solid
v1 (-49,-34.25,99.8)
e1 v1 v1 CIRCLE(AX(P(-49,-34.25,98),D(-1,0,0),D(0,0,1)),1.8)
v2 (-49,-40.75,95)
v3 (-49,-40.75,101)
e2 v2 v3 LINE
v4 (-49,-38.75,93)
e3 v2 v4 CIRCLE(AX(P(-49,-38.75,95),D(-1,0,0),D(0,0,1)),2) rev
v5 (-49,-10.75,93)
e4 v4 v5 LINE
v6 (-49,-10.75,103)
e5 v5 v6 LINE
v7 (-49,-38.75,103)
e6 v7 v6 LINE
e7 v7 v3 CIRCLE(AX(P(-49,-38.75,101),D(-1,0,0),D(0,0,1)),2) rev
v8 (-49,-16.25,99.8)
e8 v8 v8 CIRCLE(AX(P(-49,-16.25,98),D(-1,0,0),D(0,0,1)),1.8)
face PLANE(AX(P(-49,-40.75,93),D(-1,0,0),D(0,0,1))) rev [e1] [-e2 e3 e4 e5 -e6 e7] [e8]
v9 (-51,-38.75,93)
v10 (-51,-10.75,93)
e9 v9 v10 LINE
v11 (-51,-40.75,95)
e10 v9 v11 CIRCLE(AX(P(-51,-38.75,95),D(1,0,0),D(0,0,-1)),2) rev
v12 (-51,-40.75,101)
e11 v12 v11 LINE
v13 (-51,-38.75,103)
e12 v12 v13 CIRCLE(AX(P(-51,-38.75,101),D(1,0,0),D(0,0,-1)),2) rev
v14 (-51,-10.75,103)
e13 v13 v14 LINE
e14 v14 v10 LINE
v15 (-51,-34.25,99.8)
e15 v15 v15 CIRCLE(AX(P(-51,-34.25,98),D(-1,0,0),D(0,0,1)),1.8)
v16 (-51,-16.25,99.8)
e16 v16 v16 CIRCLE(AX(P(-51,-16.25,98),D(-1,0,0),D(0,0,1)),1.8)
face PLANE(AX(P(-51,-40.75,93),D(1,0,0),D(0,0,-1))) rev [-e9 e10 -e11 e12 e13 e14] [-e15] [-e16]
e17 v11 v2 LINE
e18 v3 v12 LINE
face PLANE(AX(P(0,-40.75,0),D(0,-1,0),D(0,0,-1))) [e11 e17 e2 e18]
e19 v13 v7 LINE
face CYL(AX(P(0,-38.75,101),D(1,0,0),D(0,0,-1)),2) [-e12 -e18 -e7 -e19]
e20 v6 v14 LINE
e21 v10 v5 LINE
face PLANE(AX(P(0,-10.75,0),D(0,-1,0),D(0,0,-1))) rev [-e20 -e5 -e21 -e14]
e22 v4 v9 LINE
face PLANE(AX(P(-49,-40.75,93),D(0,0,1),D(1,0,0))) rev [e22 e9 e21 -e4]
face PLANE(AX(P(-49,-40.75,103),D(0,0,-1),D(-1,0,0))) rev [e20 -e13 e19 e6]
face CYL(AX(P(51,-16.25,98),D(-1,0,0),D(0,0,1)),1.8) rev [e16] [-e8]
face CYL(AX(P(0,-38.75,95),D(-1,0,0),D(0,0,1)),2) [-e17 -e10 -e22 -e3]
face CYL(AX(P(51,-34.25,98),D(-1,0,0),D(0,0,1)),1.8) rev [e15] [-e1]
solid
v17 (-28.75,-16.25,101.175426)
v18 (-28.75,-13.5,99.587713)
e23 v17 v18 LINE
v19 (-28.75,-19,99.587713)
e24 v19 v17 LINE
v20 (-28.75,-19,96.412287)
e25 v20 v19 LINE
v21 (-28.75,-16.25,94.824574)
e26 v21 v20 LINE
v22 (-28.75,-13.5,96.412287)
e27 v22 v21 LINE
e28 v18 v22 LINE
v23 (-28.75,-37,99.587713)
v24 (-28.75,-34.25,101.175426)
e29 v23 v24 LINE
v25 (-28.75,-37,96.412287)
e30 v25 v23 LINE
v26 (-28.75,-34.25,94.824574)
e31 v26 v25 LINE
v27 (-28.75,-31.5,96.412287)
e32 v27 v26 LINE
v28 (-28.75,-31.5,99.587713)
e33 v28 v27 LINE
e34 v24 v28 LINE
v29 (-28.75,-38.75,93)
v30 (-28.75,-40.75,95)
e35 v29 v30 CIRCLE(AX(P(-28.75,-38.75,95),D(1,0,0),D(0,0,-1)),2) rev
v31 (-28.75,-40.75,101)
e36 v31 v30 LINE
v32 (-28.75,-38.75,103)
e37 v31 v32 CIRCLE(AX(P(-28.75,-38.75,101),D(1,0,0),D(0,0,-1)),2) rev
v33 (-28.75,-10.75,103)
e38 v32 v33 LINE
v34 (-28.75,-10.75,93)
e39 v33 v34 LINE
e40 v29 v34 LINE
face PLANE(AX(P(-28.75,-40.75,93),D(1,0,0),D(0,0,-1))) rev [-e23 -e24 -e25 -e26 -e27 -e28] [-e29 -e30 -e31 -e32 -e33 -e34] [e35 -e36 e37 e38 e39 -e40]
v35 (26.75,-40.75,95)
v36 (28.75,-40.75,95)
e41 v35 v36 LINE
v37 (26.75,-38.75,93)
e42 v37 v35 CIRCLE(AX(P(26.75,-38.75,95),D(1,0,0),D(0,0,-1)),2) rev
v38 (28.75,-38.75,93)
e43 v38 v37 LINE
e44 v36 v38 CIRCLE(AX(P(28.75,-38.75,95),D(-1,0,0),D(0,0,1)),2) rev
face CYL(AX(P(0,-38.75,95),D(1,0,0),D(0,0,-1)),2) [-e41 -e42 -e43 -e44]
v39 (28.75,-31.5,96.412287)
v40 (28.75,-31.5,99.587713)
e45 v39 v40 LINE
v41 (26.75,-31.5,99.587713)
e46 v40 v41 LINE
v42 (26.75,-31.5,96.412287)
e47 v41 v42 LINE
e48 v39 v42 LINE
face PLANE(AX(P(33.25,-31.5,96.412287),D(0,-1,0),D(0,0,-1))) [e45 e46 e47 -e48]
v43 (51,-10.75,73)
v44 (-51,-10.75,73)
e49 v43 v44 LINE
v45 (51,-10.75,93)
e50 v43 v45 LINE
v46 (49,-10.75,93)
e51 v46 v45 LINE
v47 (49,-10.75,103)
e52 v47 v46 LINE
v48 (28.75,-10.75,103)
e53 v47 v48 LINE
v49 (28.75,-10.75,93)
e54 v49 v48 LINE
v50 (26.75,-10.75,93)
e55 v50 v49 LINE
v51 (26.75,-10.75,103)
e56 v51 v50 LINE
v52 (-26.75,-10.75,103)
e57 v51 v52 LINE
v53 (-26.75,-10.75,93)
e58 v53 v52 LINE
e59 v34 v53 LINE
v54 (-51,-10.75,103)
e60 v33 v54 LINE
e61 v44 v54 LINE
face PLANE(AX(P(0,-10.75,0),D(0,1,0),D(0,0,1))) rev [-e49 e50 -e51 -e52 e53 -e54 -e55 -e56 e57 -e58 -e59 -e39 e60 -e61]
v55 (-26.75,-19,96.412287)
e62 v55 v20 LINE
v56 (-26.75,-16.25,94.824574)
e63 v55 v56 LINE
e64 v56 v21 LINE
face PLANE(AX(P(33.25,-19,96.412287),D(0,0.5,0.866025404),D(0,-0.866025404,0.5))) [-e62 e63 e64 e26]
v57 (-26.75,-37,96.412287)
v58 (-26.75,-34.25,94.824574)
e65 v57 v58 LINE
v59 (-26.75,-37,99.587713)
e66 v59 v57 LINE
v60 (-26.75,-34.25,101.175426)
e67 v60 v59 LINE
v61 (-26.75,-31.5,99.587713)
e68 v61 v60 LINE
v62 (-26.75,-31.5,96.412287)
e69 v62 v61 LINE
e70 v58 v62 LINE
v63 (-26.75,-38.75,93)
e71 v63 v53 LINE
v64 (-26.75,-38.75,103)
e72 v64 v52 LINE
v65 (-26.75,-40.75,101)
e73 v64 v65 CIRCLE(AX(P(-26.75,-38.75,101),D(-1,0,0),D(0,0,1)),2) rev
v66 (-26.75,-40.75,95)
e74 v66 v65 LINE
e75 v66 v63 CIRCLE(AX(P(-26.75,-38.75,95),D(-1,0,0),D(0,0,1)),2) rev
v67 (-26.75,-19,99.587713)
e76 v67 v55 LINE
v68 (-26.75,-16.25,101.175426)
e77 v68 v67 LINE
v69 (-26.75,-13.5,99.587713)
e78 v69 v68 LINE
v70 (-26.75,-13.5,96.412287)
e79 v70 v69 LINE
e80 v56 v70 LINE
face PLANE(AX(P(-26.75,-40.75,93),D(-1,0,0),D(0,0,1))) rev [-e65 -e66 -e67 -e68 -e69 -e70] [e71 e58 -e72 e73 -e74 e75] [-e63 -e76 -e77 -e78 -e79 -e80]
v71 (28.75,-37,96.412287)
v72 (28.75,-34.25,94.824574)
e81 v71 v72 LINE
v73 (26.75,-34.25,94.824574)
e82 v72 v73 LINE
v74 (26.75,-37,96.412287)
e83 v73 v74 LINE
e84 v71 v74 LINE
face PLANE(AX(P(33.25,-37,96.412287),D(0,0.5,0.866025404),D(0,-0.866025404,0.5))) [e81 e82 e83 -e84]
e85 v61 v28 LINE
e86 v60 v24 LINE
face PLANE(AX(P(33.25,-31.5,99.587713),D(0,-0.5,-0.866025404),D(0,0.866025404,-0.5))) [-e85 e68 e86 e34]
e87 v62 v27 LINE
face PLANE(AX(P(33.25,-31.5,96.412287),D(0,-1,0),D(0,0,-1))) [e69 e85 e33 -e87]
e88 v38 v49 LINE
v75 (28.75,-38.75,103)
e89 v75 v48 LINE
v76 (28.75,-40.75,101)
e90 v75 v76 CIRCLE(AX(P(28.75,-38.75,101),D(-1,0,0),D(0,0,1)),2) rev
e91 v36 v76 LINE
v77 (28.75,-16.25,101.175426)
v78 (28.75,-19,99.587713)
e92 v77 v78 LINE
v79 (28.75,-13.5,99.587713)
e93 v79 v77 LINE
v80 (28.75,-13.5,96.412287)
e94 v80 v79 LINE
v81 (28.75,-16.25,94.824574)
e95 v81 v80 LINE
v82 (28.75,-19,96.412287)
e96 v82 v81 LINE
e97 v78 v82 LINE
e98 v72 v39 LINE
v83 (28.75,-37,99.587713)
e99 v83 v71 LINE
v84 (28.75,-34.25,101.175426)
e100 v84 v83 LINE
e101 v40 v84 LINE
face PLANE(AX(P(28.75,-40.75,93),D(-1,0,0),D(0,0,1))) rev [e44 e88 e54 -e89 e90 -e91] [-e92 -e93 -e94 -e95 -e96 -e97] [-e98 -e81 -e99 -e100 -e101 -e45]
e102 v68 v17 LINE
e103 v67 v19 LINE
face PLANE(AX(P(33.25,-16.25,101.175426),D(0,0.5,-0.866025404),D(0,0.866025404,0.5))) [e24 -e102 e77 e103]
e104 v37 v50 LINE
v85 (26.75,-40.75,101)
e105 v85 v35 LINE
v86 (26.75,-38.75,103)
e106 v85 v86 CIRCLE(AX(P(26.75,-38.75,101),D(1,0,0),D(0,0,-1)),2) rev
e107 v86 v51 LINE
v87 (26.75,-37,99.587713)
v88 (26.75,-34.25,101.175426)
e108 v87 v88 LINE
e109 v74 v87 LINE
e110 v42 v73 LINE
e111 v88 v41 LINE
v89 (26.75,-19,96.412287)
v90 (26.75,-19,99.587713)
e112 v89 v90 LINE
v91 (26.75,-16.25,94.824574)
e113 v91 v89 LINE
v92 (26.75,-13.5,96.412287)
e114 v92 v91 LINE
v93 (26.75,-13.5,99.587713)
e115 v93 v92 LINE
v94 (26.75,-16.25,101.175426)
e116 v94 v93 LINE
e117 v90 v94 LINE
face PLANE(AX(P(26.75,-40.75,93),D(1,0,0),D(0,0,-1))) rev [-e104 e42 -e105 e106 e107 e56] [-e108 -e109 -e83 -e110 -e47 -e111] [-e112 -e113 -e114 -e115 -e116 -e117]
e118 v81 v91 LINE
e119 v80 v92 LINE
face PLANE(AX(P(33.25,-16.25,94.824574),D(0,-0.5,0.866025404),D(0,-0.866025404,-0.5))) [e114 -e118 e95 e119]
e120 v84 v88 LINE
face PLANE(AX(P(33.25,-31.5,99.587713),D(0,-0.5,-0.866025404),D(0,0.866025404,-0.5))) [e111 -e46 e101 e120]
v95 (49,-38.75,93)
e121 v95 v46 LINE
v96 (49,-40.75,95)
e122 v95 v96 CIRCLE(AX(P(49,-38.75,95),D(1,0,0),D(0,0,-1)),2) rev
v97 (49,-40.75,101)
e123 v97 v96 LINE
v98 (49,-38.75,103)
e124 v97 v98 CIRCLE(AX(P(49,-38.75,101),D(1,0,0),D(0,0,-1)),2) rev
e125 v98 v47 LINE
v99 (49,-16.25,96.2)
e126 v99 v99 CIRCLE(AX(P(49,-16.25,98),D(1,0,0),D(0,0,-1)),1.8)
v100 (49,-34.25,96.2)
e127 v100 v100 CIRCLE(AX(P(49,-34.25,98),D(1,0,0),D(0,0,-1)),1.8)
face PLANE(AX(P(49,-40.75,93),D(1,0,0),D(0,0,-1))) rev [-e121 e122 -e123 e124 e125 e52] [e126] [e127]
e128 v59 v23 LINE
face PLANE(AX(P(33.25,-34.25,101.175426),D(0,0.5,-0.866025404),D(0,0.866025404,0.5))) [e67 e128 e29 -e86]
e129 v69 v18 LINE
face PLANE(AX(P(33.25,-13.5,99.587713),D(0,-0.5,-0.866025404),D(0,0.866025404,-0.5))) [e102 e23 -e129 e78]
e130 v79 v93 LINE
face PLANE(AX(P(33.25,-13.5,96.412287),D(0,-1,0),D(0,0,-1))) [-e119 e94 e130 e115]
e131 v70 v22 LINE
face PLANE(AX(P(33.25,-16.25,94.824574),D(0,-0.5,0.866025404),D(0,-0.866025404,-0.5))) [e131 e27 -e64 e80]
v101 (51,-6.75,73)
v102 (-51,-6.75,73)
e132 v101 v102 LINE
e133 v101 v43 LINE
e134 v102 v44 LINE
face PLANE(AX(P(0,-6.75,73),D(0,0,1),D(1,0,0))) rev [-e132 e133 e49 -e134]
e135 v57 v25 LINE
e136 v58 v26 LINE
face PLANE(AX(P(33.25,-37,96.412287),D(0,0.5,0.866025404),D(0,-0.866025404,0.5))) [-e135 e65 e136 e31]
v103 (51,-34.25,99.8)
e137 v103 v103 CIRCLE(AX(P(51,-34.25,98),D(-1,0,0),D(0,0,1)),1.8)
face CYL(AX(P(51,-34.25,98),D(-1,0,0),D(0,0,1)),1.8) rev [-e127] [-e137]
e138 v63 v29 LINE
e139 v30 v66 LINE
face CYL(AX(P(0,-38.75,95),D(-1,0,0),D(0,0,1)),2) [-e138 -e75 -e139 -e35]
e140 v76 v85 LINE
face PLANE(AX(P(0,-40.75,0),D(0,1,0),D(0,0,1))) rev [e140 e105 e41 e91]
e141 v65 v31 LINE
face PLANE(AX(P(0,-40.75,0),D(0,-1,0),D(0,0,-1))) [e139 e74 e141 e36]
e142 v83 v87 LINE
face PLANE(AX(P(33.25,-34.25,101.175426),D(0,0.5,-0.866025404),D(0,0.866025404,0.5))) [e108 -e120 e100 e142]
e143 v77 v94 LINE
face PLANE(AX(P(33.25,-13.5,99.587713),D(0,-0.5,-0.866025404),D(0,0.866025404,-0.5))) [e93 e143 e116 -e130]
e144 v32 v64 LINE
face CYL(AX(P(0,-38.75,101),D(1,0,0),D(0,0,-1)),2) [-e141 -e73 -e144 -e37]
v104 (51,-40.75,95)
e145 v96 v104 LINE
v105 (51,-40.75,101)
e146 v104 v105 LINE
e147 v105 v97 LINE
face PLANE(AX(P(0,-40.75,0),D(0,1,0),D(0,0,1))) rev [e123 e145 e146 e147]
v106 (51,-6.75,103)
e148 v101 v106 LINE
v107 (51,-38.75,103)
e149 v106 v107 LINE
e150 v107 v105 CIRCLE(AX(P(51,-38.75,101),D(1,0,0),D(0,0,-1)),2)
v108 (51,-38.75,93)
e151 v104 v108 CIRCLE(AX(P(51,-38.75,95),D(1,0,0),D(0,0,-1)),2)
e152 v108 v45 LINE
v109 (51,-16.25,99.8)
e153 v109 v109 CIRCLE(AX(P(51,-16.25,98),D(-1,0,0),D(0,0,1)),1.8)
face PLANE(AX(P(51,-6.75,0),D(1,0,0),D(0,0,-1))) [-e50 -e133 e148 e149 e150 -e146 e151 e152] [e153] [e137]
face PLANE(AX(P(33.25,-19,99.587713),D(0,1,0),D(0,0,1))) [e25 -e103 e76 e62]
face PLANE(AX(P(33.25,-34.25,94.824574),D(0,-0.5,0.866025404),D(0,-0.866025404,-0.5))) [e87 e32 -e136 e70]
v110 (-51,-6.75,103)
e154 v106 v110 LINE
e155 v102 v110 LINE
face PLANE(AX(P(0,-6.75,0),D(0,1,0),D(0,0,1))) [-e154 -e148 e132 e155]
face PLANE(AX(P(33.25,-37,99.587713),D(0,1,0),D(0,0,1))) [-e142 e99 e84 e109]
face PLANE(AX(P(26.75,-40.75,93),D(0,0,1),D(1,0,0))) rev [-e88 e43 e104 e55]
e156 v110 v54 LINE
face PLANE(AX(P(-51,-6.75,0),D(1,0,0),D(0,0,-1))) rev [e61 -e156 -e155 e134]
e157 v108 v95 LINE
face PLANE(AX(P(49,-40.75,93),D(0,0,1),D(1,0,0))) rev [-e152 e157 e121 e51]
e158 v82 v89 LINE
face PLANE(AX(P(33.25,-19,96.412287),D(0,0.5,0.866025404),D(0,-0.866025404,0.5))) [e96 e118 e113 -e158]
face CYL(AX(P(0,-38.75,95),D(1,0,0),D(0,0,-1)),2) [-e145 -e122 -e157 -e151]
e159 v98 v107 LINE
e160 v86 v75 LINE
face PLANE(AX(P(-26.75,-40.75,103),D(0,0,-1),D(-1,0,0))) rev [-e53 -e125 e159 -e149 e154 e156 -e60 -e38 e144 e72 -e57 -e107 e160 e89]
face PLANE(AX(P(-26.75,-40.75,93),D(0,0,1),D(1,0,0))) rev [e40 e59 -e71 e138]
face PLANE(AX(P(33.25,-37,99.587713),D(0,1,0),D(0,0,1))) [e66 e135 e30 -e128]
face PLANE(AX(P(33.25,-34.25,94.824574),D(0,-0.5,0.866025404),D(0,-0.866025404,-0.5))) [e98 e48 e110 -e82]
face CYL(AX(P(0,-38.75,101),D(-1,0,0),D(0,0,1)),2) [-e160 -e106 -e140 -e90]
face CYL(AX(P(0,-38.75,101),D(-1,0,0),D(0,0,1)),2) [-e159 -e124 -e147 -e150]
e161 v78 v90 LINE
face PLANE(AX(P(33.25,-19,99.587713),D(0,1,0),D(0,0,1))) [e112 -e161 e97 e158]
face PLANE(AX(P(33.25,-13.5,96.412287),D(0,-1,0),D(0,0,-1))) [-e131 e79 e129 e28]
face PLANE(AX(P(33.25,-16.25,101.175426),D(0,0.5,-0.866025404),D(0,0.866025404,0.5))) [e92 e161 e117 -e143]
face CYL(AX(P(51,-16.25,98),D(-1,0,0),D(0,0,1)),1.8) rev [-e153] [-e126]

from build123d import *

# Parameters (mm, degrees)
SALIENTE_EXTRUIR1_DEPTH     = 9
CROQUIS1_W                  = 2
CROQUIS1_H                  = 8.9
SALIENTE_EXTRUIR1_2_DEPTH   = 9
SALIENTE_EXTRUIR1_3_DEPTH   = 9
SALIENTE_EXTRUIR1_4_DEPTH   = 9
CROQUIS2_W                  = 2
CROQUIS2_H                  = 0.3
SALIENTE_EXTRUIR3_DEPTH     = 5
SALIENTE_EXTRUIR5_DEPTH     = 8.9
CROQUIS6_R                  = 2
SALIENTE_EXTRUIR6_DEPTH     = 4
SALIENTE_EXTRUIR7_DEPTH     = 7
SALIENTE_EXTRUIR8_DEPTH     = 4
SALIENTE_EXTRUIR9_START     = 13.5
SALIENTE_EXTRUIR9_DEPTH     = 13.5
REDONDEO1_START             = -0.677871649
REDONDEO1_DEPTH             = 24.677871649
SALIENTE_EXTRUIR10_DEPTH    = 4
CORTAR_EXTRUIR1_DEPTH       = 56.136761934
CORTAR_EXTRUIR1_DEPTH_BACK  = 5
CROQUIS12_R                 = 2.75
CORTAR_EXTRUIR2_START       = -4
CROQUIS13_R                 = 2
CORTAR_EXTRUIR2_DEPTH       = 4
REDONDEO4_R                 = 5
CROQUIS15_R                 = 2.5
CORTAR_EXTRUIR4_DEPTH       = 2
CROQUIS16_W                 = 2
CROQUIS16_H                 = 10
SALIENTE_EXTRUIR11_DEPTH    = 30
SALIENTE_EXTRUIR11_2_DEPTH  = 30
SALIENTE_EXTRUIR11_3_DEPTH  = 30
SALIENTE_EXTRUIR11_4_DEPTH  = 30
SALIENTE_EXTRUIR12_DEPTH    = 4
CROQUIS19_R                 = 1.8
CORTAR_EXTRUIR6_DEPTH       = 151.577430248
CORTAR_EXTRUIR7_DEPTH       = 60
CORTAR_EXTRUIR7_DEPTH_BACK  = 10
CORTAR_EXTRUIR12_DEPTH      = 122.944915843
CORTAR_EXTRUIR12_DEPTH_BACK = 122.944915843
CROQUIS24_W                 = 213.992672445
CROQUIS24_H                 = 195.620893339
REDONDEO5_R                 = 2
REDONDEO6_R                 = 2
REDONDEO7_R                 = 2


with BuildPart() as part:
    # Croquis1 → Saliente-Extruir1 (new body)
    with BuildSketch(Plane.XY):
        Polygon((9, 6.75), (-9, 6.75), (-9, 4.75), (-7, 4.75), (7, 4.75), (9, 4.75), align=None)
    extrude(amount=SALIENTE_EXTRUIR1_DEPTH)



with BuildPart() as body_2:
    # Croquis1 → Saliente-Extruir1 2 (new body)
    with BuildSketch(Plane.XY):
        with Locations((-8, 0)):
            Rectangle(CROQUIS1_W, CROQUIS1_H)
    extrude(amount=SALIENTE_EXTRUIR1_2_DEPTH)


with BuildPart() as body_3:
    # Croquis1 → Saliente-Extruir1 3 (new body)
    with BuildSketch(Plane.XY):
        Polygon((-7, -4.75), (-9, -4.75), (-9, -6.75), (9, -6.75), (9, -4.75), (7, -4.75), align=None)
    extrude(amount=SALIENTE_EXTRUIR1_3_DEPTH)


with BuildPart() as body_4:
    # Croquis1 → Saliente-Extruir1 4 (new body)
    with BuildSketch(Plane.XY):
        with Locations((8, 0)):
            Rectangle(CROQUIS1_W, CROQUIS1_H)
    extrude(amount=SALIENTE_EXTRUIR1_4_DEPTH)


with BuildPart() as part_1:
    add(part.part)

    add(body_2.part)  # Saliente-Extruir3 merges body 2

    add(body_3.part)  # Saliente-Extruir3 merges body 3

    add(body_4.part)  # Saliente-Extruir3 merges body 4
    # Croquis2 → Saliente-Extruir3 (add)
    with BuildSketch(Plane.XY):
        with Locations((8, 4.6)):
            Rectangle(CROQUIS2_W, CROQUIS2_H)
        with Locations((8, -4.6)):
            Rectangle(CROQUIS2_W, CROQUIS2_H)
        with Locations((-8, -4.6)):
            Rectangle(CROQUIS2_W, CROQUIS2_H)
        with Locations((-8, 4.6)):
            Rectangle(CROQUIS2_W, CROQUIS2_H)
    extrude(amount=SALIENTE_EXTRUIR3_DEPTH)

    # Croquis5 → Saliente-Extruir5 (add)
    with BuildSketch(Plane(origin=(0, 4.45, 0), x_dir=(1, 0, 0), z_dir=(0, 1, 0))):
        Polygon((6, -9), (7, -9), (7, -7), align=None)
        Polygon((-7, -7), (-7, -9), (-6, -9), align=None)
    extrude(amount=-SALIENTE_EXTRUIR5_DEPTH)

    # Croquis6 → Saliente-Extruir6 (add)
    with BuildSketch(Plane.XZ.offset(6.75)):
        with BuildLine():
            ThreePointArc((-50, 9), (0, -3), (50, 9))
            Line((50, 9), (50, 24))
            ThreePointArc((50, 24), (36.757105541, 16.769444448), (22.5, 11.830808117))
            Line((22.5, 11.830808117), (22.5, 3.422761334))
            ThreePointArc((22.5, 3.422761334), (0, 1.452024157), (-22.5, 3.422761334))
            Line((-22.5, 3.422761334), (-22.5, 11.830808117))
            ThreePointArc((-22.5, 11.830808117), (-36.757105541, 16.769444448), (-50, 24))
            Line((-50, 24), (-50, 9))
        make_face()
        with Locations(Location((46, 16.452024157, 0), (0, 0, 270))):
            Circle(CROQUIS6_R, mode=Mode.SUBTRACT)
        with Locations(Location((-46, 16.452024157, 0), (0, 0, 270))):
            Circle(CROQUIS6_R, mode=Mode.SUBTRACT)
    extrude(amount=SALIENTE_EXTRUIR6_DEPTH)

    # Croquis6<3> → Saliente-Extruir7 (add)
    with BuildSketch(Plane.XZ.offset(6.75)):
        with BuildLine():
            ThreePointArc((-50, 9), (0, -3), (50, 9))
            Line((50, 9), (50, 11.5))
            ThreePointArc((50, 11.5), (36.47427787, 6.697797755), (22.5, 3.422761334))
            ThreePointArc((22.5, 3.422761334), (15.771787387, 2.416580824), (9, 1.765320682))
            Line((9, 1.765320682), (9, 0))
            Line((9, 0), (-9, 0))
            Line((-9, 0), (-9, 1.765320682))
            ThreePointArc((-9, 1.765320682), (-15.771787387, 2.416580824), (-22.5, 3.422761334))
            ThreePointArc((-22.5, 3.422761334), (-36.47427787, 6.697797755), (-50, 11.5))
            Line((-50, 11.5), (-50, 9))
        make_face()
        with BuildLine():
            Line((9, 0), (9, 1.765320682))
            ThreePointArc((9, 1.765320682), (0, 1.452024157), (-9, 1.765320682))
            Line((-9, 1.765320682), (-9, 0))
            Line((-9, 0), (9, 0))
        make_face()
    extrude(amount=SALIENTE_EXTRUIR7_DEPTH)

    # Croquis7 → Saliente-Extruir8 (add)
    with BuildSketch(Plane.XZ.offset(13.75)):
        with BuildLine():
            Line((-22.5, 3.422761334), (-22.5, 11.830808117))
            ThreePointArc((-22.5, 11.830808117), (-36.757105541, 16.769444448), (-50, 24))
            Line((-50, 24), (-50, 11.5))
            Line((-50, 11.5), (-50, 9))
            ThreePointArc((-50, 9), (0, -3), (50, 9))
            Line((50, 9), (50, 11.5))
            Line((50, 11.5), (50, 24))
            ThreePointArc((50, 24), (36.757105541, 16.769444448), (22.5, 11.830808117))
            Line((22.5, 11.830808117), (22.5, 3.422761334))
            ThreePointArc((22.5, 3.422761334), (15.771787387, 2.416580824), (9, 1.765320682))
            ThreePointArc((9, 1.765320682), (0, 1.452024157), (-9, 1.765320682))
            ThreePointArc((-9, 1.765320682), (-15.771787387, 2.416580824), (-22.5, 3.422761334))
        make_face()
    extrude(amount=SALIENTE_EXTRUIR8_DEPTH)

    # Croquis8 → Saliente-Extruir9 (add)
    with BuildSketch(Plane(origin=(0, -6.75, 0), x_dir=(1, 0, 0), z_dir=(0, 1, 0)).offset(SALIENTE_EXTRUIR9_START)):
        with BuildLine():
            Line((-50, -9), (-50, -11.5))
            ThreePointArc((-50, -11.5), (-36.47427787, -6.697797755), (-22.5, -3.422761334))
            Line((-22.5, -3.422761334), (-22.5, 0.677871649))
            ThreePointArc((-22.5, 0.677871649), (-36.571543581, -3.247387202), (-50, -9))
        make_face()
        with BuildLine():
            Line((50, -9), (50, -11.5))
            ThreePointArc((50, -11.5), (36.47427787, -6.697797755), (22.5, -3.422761334))
            Line((22.5, -3.422761334), (22.5, 0.677871649))
            ThreePointArc((22.5, 0.677871649), (36.571543581, -3.247387202), (50, -9))
        make_face()
    extrude(amount=-SALIENTE_EXTRUIR9_DEPTH)

    # Redondeo1: read off the stored shape, not the designer's step
    # Redondeo1 outline → Redondeo1 (cut)
    with BuildSketch(Plane.XY.offset(REDONDEO1_START)):
        with BuildLine():
            ThreePointArc((35, 6.75), (45.606601718, 2.356601718), (50, -8.25))
            Line((50, -8.25), (50, 6.75))
            Line((50, 6.75), (35, 6.75))
        make_face()
        with BuildLine():
            ThreePointArc((-50, -8.25), (-45.606601718, 2.356601718), (-35, 6.75))
            Line((-35, 6.75), (-50, 6.75))
            Line((-50, 6.75), (-50, -8.25))
        make_face()
    extrude(amount=REDONDEO1_DEPTH, mode=Mode.SUBTRACT)

    # Croquis11 → Saliente-Extruir10 (add)
    with BuildSketch(Plane.XZ.offset(6.75)):
        with BuildLine():
            Line((-9, 9), (-9, 1.765320682))
            ThreePointArc((-9, 1.765320682), (0, 1.452024157), (9, 1.765320682))
            Line((9, 1.765320682), (9, 9))
            Line((9, 9), (-9, 9))
        make_face()
    extrude(amount=SALIENTE_EXTRUIR10_DEPTH)

    # Croquis12 → Cortar-Extruir1 (cut, two sides: drawn at the far end of the back side and taken through both)
    with BuildSketch(Plane(origin=(0, 0, 9), x_dir=(-1, 0, 0), z_dir=(0, 0, -1)).offset(-CORTAR_EXTRUIR1_DEPTH_BACK)):
        with Locations(Location((-37, 0, 0), (0, 0, 180))):
            Circle(CROQUIS12_R)
        with Locations(Location((37, 0, 0), (0, 0, 180))):
            Circle(CROQUIS12_R)
    extrude(amount=CORTAR_EXTRUIR1_DEPTH + CORTAR_EXTRUIR1_DEPTH_BACK, mode=Mode.SUBTRACT)

    # Croquis13 → Cortar-Extruir2 (cut)
    with BuildSketch(Plane.XZ.offset(17.75).offset(CORTAR_EXTRUIR2_START)):
        with Locations(Location((46, 16.452024157, 0), (0, 0, 270))):
            Circle(CROQUIS13_R)
        with Locations(Location((-46, 16.452024157, 0), (0, 0, 270))):
            Circle(CROQUIS13_R)
    extrude(amount=CORTAR_EXTRUIR2_DEPTH, mode=Mode.SUBTRACT)

    # Redondeo4
    redondeo4_edges = [part_1.edges().sort_by_distance(p)[0] for p in [
        (-22.5, 6.75, 1.372444842),
        (22.5, 6.75, 1.372444842),
    ]]
    fillet(redondeo4_edges, radius=REDONDEO4_R)

    # Croquis15 → Cortar-Extruir4 (cut)
    with BuildSketch(Plane(origin=(0, -6.75, 0), x_dir=(1, 0, 0), z_dir=(0, 1, 0))):
        with Locations(Location((-46, -16.452024157, 0), (0, 0, 270))):
            Circle(CROQUIS15_R)
        with Locations(Location((46, -16.452024157, 0), (0, 0, 270))):
            Circle(CROQUIS15_R)
    extrude(amount=-CORTAR_EXTRUIR4_DEPTH, mode=Mode.SUBTRACT)

    # Croquis24 → Cortar-Extruir12 (cut, two sides: drawn at the far end of the back side and taken through both)
    with BuildSketch(Plane(origin=(0, 0, 0), x_dir=(0, 0, -1), z_dir=(1, 0, 0)).offset(-CORTAR_EXTRUIR12_DEPTH_BACK)):
        with Locations((-61.147337457, 3.742604374)):
            Rectangle(CROQUIS24_W, CROQUIS24_H)
    extrude(amount=CORTAR_EXTRUIR12_DEPTH + CORTAR_EXTRUIR12_DEPTH_BACK, mode=Mode.SUBTRACT)


with BuildPart() as body_2_2:
    # Croquis16 → Saliente-Extruir11 (new body)
    with BuildSketch(Plane.XZ.offset(10.75)):
        with Locations((27.75, 98)):
            Rectangle(CROQUIS16_W, CROQUIS16_H)
    extrude(amount=SALIENTE_EXTRUIR11_DEPTH)


with BuildPart() as body_3_2:
    # Croquis16 → Saliente-Extruir11 2 (new body)
    with BuildSketch(Plane.XZ.offset(10.75)):
        with Locations((-27.75, 98)):
            Rectangle(CROQUIS16_W, CROQUIS16_H)
    extrude(amount=SALIENTE_EXTRUIR11_2_DEPTH)


    add(body_2_2.part)  # Saliente-Extruir12 merges body 2 2


with BuildPart() as body_4_2:
    # Croquis16 → Saliente-Extruir11 3 (new body)
    with BuildSketch(Plane.XZ.offset(10.75)):
        with Locations((50, 98)):
            Rectangle(CROQUIS16_W, CROQUIS16_H)
    extrude(amount=SALIENTE_EXTRUIR11_3_DEPTH)


with BuildPart() as body_5:
    # Croquis16 → Saliente-Extruir11 4 (new body)
    with BuildSketch(Plane.XZ.offset(10.75)):
        with Locations((-50, 98)):
            Rectangle(CROQUIS16_W, CROQUIS16_H)
    extrude(amount=SALIENTE_EXTRUIR11_4_DEPTH)


with BuildPart() as body_3_2_1:
    add(body_3_2.part)

    add(body_4_2.part)  # Saliente-Extruir12 merges body 4 2
    # Croquis17 → Saliente-Extruir12 (add)
    with BuildSketch(Plane(origin=(0, -10.75, 0), x_dir=(1, 0, 0), z_dir=(0, 1, 0))):
        Polygon((51, -73), (-51, -73), (-51, -103), (-26.75, -103), (26.75, -103), (51, -103), align=None)
    extrude(amount=SALIENTE_EXTRUIR12_DEPTH)


with BuildPart() as cortar_extruir6_tool:
    # Croquis19 → Cortar-Extruir6 (new, through all)
    with BuildSketch(Plane.ZY.offset(51)):
        with Locations((98, -16.25)):
            Circle(CROQUIS19_R)
        with Locations((98, -34.25)):
            Circle(CROQUIS19_R)
    extrude(amount=-CORTAR_EXTRUIR6_DEPTH)


with BuildPart() as body_3_2_2:
    add(body_3_2_1.part)

    # Cortar-Extruir6: cut by cortar_extruir6_tool
    add(cortar_extruir6_tool.part, mode=Mode.SUBTRACT)

    # Croquis20 → Cortar-Extruir7 (cut, two sides: drawn at the far end of the back side and taken through both)
    with BuildSketch(Plane(origin=(-26.75, 0, 0), x_dir=(0, 0, -1), z_dir=(1, 0, 0)).offset(-CORTAR_EXTRUIR7_DEPTH_BACK)):
        Polygon((-99.58771324, -31.5), (-101.175426481, -34.25), (-99.58771324, -37), (-96.41228676, -37), (-94.824573519, -34.25), (-96.41228676, -31.5), align=None)
        Polygon((-99.58771324, -19), (-96.41228676, -19), (-94.824573519, -16.25), (-96.41228676, -13.5), (-99.58771324, -13.5), (-101.175426481, -16.25), align=None)
    extrude(amount=CORTAR_EXTRUIR7_DEPTH + CORTAR_EXTRUIR7_DEPTH_BACK, mode=Mode.SUBTRACT)

    # Redondeo5
    redondeo5_edges = [body_3_2_2.edges().sort_by_distance(p)[0] for p in [
        (27.75, -40.75, 93),
        (27.75, -40.75, 103),
        (50, -40.75, 93),
        (50, -40.75, 103),
    ]]
    fillet(redondeo5_edges, radius=REDONDEO5_R)

    # Redondeo6
    redondeo6_edges = [body_3_2_2.edges().sort_by_distance(p)[0] for p in [
        (-27.75, -40.75, 93),
        (-27.75, -40.75, 103),
    ]]
    fillet(redondeo6_edges, radius=REDONDEO6_R)


with BuildPart() as body_5_1:
    add(body_5.part)

    # Cortar-Extruir6: cut by cortar_extruir6_tool
    add(cortar_extruir6_tool.part, mode=Mode.SUBTRACT)

    # Redondeo7
    redondeo7_edges = [body_5_1.edges().sort_by_distance(p)[0] for p in [
        (-50, -40.75, 93),
        (-50, -40.75, 103),
    ]]
    fillet(redondeo7_edges, radius=REDONDEO7_R)


solid = Compound([body_3_2_2.part, body_5_1.part])
